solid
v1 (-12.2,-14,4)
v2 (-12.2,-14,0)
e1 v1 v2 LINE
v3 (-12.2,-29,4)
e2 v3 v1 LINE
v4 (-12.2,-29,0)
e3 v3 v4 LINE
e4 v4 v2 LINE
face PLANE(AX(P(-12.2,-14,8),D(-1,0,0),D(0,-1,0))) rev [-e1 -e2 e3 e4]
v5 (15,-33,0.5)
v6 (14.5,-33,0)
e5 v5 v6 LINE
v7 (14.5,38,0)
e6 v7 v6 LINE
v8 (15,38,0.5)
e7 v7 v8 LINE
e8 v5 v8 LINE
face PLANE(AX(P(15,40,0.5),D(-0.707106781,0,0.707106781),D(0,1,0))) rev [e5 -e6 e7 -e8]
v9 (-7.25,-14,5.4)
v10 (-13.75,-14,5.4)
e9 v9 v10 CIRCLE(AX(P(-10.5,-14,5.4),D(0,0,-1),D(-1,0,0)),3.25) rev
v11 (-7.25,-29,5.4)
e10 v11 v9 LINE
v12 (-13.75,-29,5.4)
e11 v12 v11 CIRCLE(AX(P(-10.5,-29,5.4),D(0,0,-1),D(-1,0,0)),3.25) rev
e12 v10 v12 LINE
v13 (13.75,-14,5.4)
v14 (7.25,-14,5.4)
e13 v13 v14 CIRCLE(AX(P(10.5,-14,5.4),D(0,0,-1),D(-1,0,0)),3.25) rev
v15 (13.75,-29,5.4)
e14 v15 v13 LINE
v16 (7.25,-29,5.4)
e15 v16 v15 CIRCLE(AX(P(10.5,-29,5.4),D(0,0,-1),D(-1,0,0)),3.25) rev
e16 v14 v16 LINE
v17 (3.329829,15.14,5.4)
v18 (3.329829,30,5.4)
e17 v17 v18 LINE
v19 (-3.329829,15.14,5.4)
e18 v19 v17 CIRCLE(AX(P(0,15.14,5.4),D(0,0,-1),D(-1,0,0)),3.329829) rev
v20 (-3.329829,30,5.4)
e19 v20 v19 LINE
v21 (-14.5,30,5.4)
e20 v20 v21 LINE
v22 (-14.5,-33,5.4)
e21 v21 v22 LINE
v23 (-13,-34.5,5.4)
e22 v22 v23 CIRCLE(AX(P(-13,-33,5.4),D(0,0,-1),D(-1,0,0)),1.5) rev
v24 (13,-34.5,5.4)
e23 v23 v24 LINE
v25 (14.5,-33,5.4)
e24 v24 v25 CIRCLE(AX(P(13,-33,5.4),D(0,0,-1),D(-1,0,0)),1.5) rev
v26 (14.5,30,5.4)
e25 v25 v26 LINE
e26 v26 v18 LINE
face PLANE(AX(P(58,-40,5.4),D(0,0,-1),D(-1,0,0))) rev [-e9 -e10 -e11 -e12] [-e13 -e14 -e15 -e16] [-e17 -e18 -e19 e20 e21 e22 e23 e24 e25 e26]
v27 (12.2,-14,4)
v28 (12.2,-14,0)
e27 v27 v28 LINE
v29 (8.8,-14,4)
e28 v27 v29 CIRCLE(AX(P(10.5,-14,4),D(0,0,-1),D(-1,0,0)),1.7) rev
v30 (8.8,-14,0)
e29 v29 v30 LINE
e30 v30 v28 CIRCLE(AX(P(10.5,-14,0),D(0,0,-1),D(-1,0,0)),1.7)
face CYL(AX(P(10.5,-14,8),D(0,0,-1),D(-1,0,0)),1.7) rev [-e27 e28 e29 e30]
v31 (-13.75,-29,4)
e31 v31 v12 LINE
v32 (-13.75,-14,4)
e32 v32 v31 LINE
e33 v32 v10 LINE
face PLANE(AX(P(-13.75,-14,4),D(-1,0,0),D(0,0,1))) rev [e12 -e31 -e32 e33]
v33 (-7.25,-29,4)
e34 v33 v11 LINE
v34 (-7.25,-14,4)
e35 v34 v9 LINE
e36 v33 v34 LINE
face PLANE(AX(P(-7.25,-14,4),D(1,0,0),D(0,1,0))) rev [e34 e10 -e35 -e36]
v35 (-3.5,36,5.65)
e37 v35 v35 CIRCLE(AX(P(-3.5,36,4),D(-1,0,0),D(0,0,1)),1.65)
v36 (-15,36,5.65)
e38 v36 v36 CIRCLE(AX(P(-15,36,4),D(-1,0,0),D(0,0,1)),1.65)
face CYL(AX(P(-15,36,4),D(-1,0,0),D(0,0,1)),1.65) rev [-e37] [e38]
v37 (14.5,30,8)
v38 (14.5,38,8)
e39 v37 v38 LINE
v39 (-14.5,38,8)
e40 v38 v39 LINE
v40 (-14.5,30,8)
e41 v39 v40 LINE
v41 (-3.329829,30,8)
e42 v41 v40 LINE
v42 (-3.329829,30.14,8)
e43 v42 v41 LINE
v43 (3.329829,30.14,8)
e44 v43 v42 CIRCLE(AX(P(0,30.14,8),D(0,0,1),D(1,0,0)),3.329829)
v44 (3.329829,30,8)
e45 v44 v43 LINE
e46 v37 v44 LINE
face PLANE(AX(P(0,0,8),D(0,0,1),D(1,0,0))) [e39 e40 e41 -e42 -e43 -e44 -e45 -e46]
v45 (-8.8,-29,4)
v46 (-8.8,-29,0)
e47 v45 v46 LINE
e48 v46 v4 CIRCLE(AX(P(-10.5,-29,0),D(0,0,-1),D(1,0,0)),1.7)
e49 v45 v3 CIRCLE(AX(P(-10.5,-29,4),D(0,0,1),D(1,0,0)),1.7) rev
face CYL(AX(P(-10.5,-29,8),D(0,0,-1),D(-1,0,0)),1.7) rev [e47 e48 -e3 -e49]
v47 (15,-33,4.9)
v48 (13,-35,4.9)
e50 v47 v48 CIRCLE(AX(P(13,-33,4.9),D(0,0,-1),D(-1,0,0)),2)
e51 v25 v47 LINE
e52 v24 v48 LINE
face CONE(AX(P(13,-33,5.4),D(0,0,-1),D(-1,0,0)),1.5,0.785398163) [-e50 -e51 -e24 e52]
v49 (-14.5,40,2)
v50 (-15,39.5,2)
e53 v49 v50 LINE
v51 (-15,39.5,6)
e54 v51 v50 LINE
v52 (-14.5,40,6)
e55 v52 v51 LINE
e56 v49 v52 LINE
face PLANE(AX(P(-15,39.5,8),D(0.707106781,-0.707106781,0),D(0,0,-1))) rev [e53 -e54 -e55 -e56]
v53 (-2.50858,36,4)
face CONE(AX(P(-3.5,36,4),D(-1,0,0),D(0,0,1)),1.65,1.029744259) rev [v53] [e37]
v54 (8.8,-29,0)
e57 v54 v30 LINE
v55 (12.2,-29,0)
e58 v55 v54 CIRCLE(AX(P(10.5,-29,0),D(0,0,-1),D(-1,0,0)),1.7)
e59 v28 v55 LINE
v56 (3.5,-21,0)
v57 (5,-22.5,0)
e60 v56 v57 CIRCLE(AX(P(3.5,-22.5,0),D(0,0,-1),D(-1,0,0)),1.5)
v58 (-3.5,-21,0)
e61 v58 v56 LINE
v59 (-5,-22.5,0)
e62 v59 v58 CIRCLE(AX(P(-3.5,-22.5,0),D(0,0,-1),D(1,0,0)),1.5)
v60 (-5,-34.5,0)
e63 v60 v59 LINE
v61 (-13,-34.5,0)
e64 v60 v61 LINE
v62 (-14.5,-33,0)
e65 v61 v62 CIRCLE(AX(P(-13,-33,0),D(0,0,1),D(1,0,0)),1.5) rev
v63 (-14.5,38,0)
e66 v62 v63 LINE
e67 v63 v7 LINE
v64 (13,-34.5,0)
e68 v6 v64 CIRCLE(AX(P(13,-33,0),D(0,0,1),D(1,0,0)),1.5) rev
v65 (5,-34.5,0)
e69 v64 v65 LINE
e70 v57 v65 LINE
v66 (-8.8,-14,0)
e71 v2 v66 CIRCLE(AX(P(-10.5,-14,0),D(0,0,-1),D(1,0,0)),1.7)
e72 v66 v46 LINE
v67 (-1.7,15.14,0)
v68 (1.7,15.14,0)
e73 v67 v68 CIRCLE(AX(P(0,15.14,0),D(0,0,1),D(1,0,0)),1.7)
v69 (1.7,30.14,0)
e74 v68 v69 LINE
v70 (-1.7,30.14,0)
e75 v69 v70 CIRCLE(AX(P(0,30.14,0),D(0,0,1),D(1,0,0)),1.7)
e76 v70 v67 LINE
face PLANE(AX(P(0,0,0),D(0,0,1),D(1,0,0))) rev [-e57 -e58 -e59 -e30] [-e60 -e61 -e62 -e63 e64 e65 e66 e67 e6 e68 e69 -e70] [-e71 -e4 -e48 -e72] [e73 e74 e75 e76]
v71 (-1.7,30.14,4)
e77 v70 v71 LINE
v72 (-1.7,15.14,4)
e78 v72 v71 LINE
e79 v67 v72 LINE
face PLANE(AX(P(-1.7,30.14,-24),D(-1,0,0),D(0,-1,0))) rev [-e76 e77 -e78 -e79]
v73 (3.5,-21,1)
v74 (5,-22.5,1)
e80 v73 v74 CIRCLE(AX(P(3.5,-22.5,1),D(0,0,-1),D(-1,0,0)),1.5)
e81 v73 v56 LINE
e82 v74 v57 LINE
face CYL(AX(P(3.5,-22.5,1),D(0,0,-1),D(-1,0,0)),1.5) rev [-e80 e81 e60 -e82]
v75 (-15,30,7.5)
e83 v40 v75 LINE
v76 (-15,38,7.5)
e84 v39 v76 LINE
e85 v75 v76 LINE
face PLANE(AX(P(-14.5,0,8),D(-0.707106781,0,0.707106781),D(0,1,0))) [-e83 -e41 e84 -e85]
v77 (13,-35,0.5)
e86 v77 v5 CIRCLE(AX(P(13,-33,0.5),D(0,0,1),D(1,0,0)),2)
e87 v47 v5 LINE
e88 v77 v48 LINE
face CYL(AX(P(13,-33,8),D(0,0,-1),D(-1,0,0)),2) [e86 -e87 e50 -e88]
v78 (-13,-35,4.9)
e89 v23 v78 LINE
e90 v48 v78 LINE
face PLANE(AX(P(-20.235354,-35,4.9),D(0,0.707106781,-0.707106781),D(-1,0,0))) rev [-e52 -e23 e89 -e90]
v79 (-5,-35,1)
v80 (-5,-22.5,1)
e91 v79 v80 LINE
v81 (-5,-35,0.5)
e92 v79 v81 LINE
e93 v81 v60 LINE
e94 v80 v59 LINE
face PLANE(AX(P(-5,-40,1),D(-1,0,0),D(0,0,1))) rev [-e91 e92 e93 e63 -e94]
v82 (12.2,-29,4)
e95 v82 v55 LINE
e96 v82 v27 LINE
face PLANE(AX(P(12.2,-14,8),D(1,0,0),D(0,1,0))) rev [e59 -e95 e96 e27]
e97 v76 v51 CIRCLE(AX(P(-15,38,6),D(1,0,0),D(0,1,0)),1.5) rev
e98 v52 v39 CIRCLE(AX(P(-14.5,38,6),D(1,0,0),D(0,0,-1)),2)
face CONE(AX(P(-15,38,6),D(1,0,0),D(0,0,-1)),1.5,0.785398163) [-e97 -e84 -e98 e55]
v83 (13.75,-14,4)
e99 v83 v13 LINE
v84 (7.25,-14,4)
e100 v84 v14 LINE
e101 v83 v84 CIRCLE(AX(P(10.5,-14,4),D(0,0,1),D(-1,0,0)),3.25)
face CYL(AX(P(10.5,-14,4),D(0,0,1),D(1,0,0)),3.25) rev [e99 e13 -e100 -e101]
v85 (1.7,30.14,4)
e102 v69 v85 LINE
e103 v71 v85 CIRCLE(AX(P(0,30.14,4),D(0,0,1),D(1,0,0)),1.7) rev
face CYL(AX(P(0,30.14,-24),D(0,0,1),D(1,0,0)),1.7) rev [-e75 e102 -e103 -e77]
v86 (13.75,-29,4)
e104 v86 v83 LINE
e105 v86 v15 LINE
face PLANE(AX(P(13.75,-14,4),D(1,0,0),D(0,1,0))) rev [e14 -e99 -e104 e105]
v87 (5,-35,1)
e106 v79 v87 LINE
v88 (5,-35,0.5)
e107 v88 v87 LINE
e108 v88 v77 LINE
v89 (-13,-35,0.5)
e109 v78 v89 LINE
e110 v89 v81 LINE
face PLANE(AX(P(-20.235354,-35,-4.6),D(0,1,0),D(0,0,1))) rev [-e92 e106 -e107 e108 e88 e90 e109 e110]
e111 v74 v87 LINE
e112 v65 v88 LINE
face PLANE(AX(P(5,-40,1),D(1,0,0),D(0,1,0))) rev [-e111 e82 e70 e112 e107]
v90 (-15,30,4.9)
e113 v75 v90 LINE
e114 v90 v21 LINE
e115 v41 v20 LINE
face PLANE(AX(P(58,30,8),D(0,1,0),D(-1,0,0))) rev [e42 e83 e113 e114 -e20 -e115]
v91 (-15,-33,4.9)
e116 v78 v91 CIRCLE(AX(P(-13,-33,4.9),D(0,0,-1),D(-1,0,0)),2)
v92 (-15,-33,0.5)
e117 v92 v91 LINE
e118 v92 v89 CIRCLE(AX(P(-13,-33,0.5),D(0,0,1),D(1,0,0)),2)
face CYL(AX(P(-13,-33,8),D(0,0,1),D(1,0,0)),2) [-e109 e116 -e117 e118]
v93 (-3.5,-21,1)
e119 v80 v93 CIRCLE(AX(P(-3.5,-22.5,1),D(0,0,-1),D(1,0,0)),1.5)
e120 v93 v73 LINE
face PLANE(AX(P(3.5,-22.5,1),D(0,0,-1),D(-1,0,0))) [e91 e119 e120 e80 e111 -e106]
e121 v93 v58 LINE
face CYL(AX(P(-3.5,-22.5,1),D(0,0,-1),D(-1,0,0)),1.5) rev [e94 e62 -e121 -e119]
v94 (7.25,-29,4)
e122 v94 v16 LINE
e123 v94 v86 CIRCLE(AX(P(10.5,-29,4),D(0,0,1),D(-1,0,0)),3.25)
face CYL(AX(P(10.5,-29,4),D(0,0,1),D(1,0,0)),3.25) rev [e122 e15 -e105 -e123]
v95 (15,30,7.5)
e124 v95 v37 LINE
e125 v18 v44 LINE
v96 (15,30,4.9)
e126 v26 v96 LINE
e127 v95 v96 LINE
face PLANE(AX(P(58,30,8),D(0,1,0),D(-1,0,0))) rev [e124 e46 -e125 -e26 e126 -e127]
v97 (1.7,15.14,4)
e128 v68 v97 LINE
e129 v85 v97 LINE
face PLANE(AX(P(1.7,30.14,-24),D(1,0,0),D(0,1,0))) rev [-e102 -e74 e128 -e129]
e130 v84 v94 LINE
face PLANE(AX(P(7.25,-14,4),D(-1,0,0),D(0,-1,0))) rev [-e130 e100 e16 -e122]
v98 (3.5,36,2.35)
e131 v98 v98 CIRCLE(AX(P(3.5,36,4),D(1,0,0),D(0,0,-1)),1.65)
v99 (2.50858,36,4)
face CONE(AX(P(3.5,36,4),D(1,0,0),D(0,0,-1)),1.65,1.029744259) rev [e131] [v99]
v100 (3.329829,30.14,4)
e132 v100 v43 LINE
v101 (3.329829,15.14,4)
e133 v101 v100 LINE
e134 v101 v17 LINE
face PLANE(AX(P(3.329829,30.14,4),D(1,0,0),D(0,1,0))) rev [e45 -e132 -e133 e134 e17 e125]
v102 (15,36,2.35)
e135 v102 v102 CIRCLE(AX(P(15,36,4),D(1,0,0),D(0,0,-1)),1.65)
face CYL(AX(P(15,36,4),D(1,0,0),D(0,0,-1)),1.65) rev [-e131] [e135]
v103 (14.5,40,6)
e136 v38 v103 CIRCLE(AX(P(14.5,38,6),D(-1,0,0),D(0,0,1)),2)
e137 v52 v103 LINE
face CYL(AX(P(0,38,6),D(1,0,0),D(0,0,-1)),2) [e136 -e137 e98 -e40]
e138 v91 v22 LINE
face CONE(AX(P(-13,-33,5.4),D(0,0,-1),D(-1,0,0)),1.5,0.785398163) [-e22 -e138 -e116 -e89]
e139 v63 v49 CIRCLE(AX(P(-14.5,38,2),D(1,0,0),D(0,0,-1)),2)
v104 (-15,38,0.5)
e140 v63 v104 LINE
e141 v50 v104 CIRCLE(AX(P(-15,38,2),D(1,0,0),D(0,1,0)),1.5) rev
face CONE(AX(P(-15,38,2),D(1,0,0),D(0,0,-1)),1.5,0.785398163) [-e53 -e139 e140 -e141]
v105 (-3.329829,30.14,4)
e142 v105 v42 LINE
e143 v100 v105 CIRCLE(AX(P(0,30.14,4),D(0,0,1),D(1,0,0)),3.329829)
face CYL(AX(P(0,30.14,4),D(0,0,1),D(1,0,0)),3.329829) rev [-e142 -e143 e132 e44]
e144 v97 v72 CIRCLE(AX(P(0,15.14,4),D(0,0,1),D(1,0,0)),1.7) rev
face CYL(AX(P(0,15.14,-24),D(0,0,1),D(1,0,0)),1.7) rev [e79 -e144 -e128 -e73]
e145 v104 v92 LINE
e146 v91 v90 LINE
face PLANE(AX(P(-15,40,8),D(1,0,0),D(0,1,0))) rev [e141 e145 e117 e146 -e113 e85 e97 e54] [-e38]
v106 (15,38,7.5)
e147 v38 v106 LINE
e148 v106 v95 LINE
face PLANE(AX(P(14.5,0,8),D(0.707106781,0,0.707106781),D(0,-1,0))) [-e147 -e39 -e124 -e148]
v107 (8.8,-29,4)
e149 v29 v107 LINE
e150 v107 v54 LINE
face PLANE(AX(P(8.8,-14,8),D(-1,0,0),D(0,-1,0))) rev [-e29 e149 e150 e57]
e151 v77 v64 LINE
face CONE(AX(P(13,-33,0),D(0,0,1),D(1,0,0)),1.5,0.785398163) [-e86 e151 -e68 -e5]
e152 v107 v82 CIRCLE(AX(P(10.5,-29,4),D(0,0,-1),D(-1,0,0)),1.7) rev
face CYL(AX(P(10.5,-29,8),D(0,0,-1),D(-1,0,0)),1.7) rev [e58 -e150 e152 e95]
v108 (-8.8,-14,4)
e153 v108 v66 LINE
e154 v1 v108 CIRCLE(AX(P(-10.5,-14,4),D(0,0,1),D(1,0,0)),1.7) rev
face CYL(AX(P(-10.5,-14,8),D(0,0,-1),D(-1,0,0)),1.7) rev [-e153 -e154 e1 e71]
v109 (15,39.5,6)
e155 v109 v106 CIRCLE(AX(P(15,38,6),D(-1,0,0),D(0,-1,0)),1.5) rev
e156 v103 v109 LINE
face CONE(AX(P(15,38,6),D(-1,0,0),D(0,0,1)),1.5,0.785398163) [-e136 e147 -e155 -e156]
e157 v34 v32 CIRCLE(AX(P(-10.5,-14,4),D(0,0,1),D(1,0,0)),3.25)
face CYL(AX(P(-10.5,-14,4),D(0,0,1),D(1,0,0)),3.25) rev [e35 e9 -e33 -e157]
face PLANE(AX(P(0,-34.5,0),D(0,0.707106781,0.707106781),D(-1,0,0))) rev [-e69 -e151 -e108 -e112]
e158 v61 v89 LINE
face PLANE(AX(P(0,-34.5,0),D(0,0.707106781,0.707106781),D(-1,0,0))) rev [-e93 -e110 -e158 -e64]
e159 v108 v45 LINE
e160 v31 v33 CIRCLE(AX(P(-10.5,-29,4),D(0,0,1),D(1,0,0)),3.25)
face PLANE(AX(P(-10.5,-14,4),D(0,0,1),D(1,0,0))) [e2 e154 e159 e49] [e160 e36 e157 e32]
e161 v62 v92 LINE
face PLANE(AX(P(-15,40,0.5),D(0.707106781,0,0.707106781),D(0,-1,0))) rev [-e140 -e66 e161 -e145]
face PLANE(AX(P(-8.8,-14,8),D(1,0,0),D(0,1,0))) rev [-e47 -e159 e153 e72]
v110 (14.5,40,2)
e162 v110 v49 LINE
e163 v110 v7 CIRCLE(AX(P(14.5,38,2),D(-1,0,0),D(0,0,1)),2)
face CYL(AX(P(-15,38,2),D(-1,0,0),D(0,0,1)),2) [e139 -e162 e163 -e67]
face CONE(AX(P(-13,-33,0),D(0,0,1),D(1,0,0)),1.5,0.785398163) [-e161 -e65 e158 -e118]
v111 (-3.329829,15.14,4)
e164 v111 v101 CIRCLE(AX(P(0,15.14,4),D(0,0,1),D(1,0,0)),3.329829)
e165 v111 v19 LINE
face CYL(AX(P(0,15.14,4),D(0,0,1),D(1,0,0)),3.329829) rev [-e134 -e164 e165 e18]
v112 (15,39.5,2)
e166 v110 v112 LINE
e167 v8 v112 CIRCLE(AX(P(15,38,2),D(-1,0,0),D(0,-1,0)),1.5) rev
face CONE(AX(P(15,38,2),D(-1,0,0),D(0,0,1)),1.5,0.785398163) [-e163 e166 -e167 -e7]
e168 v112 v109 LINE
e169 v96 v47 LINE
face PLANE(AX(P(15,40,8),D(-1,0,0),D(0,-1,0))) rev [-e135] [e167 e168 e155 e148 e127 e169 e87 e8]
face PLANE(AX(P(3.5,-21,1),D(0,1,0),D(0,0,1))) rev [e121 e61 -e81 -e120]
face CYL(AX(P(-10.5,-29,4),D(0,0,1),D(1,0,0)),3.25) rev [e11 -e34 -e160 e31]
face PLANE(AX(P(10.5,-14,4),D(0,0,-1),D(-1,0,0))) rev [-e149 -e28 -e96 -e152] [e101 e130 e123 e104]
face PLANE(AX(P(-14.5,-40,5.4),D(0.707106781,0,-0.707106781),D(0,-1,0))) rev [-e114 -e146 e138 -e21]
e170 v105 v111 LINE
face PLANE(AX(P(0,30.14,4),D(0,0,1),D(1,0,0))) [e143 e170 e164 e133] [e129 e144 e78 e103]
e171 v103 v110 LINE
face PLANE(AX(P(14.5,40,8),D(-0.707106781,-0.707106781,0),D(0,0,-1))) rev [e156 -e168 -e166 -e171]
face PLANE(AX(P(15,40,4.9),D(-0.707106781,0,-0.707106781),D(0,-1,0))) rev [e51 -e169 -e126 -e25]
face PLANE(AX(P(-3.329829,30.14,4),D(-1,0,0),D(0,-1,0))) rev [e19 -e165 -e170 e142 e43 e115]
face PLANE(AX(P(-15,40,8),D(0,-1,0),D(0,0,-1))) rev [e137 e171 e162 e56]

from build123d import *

# Parameters (mm, degrees)
SKETCH1_W           = 30
SKETCH1_H           = 80
BOSS_EXTRUDE1_DEPTH = 8
CUT_EXTRUDE1_DEPTH  = 44.462627624
CUT_EXTRUDE2_DEPTH  = 4
CUT_EXTRUDE3_DEPTH  = 32
CUT_EXTRUDE4_DEPTH  = 4
SKETCH8_W           = 2.6
SKETCH8_H           = 70
CUT_EXTRUDE5_DEPTH  = 73
FILLET1_R           = 2
FILLET2_R           = 2
CHAMFER1_SIZE       = 0.5
CUT_EXTRUDE7_DEPTH  = 1
SKETCH10_W          = 41.633807812
SKETCH10_H          = 5
CUT_EXTRUDE8_DEPTH  = 10
FILLET3_R           = 2
CHAMFER2_SIZE       = 0.5


with BuildPart() as part:
    # Sketch1 → Boss-Extrude1 (new body)
    with BuildSketch(Plane.XY):
        Rectangle(SKETCH1_W, SKETCH1_H)
    extrude(amount=BOSS_EXTRUDE1_DEPTH)

    # Sketch3 → M4 Tapped Hole1 (revolve, cut)
    with BuildSketch(Plane(origin=(-15, 36, 4), x_dir=(0, 0, 1), z_dir=(0, 1, 0))):
        Polygon((0, 0), (0, 12.491420021), (1.65, 11.5), (1.65, 0), align=None)
    m4_tapped_hole1 = revolve(axis=Axis((-21.35, 36, 4), (1, 0, 0)), mode=Mode.SUBTRACT)

    # Mirror1: M4 Tapped Hole1 across plane
    add(m4_tapped_hole1.mirror(Plane.ZY), mode=Mode.SUBTRACT)

    # Sketch4 → Cut-Extrude1 (cut, through all)
    with BuildSketch(Plane(origin=(0, 0, 0), x_dir=(-1, 0, 0), z_dir=(0, 0, -1))):
        with BuildLine():
            Line((-8.8, -14), (-8.8, -29))
            ThreePointArc((-8.8, -29), (-10.5, -30.7), (-12.2, -29))
            Line((-12.2, -29), (-12.2, -14))
            ThreePointArc((-12.2, -14), (-10.5, -12.3), (-8.8, -14))
        make_face()
        with BuildLine():
            Line((8.8, -14), (8.8, -29))
            ThreePointArc((8.8, -29), (10.5, -30.7), (12.2, -29))
            Line((12.2, -29), (12.2, -14))
            ThreePointArc((12.2, -14), (10.5, -12.3), (8.8, -14))
        make_face()
    extrude(amount=-CUT_EXTRUDE1_DEPTH, mode=Mode.SUBTRACT)

    # Sketch5 → Cut-Extrude2 (cut)
    with BuildSketch(Plane.XY.offset(8)):
        with BuildLine():
            Line((-7.25, -14), (-7.25, -29))
            ThreePointArc((-7.25, -29), (-10.5, -32.25), (-13.75, -29))
            Line((-13.75, -29), (-13.75, -14))
            ThreePointArc((-13.75, -14), (-10.5, -10.75), (-7.25, -14))
        make_face()
        with BuildLine():
            Line((7.25, -14), (7.25, -29))
            ThreePointArc((7.25, -29), (10.5, -32.25), (13.75, -29))
            Line((13.75, -29), (13.75, -14))
            ThreePointArc((13.75, -14), (10.5, -10.75), (7.25, -14))
        make_face()
    extrude(amount=-CUT_EXTRUDE2_DEPTH, mode=Mode.SUBTRACT)

    # Sketch6 → Cut-Extrude3 (cut)
    with BuildSketch(Plane.XY.offset(8)):
        with BuildLine():
            Line((1.7, 30.14), (1.7, 15.14))
            ThreePointArc((1.7, 15.14), (0, 13.44), (-1.7, 15.14))
            Line((-1.7, 15.14), (-1.7, 30.14))
            ThreePointArc((-1.7, 30.14), (0, 31.84), (1.7, 30.14))
        make_face()
    extrude(amount=-CUT_EXTRUDE3_DEPTH, mode=Mode.SUBTRACT)

    # Sketch7 → Cut-Extrude4 (cut)
    with BuildSketch(Plane.XY.offset(8)):
        with BuildLine():
            Line((3.329829484, 30.14), (3.329829484, 15.14))
            ThreePointArc((3.329829484, 15.14), (0, 11.810170516), (-3.329829484, 15.14))
            Line((-3.329829484, 15.14), (-3.329829484, 30.14))
            ThreePointArc((-3.329829484, 30.14), (0, 33.469829484), (3.329829484, 30.14))
        make_face()
    extrude(amount=-CUT_EXTRUDE4_DEPTH, mode=Mode.SUBTRACT)

    # Sketch8 → Cut-Extrude5 (cut)
    with BuildSketch(Plane.ZY.offset(15)):
        with Locations((6.7, -5)):
            Rectangle(SKETCH8_W, SKETCH8_H)
    extrude(amount=-CUT_EXTRUDE5_DEPTH, mode=Mode.SUBTRACT)

    # Fillet1
    fillet1_edges = [part.edges().sort_by_distance(p)[0] for p in [
        (0, 40, 0),
        (0, 40, 8),
    ]]
    fillet(fillet1_edges, radius=FILLET1_R)

    # Fillet2
    fillet2_edges = [part.edges().sort_by_distance(p)[0] for p in [
        (15, -40, 2.7),
        (-15, -40, 2.7),
    ]]
    fillet(fillet2_edges, radius=FILLET2_R)

    # Chamfer1
    chamfer1_edges = [part.edges().sort_by_distance(p)[0] for p in [
        (15, 34, 8),
        (15, -4, 5.4),
        (-15, -4, 5.4),
        (-15, 34, 8),
        (-15, 40, 4),
        (-15, 0, 0),
        (-15, 39.414213562, 0.585786438),
        (-15, 39.414213562, 7.414213562),
        (15, 40, 4),
        (15, 39.414213562, 0.585786438),
        (15, 39.414213562, 7.414213562),
        (0, -40, 5.4),
        (0, -40, 0),
        (15, 0, 0),
        (14.414213562, -39.414213562, 0),
        (-14.414213562, -39.414213562, 0),
        (14.414213562, -39.414213562, 5.4),
        (-14.414213562, -39.414213562, 5.4),
    ]]
    chamfer(chamfer1_edges, length=CHAMFER1_SIZE)

    # Sketch9 → Cut-Extrude7 (cut)
    with BuildSketch(Plane(origin=(0, 0, 0), x_dir=(-1, 0, 0), z_dir=(0, 0, -1))):
        with BuildLine():
            Line((-5, -40), (5, -40))
            Line((5, -40), (5, -22.5))
            ThreePointArc((5, -22.5), (4.560660172, -21.439339828), (3.5, -21))
            Line((3.5, -21), (-3.5, -21))
            ThreePointArc((-3.5, -21), (-4.560660172, -21.439339828), (-5, -22.5))
            Line((-5, -22.5), (-5, -40))
        make_face()
    extrude(amount=-CUT_EXTRUDE7_DEPTH, mode=Mode.SUBTRACT)

    # Sketch10 → Cut-Extrude8 (cut)
    with BuildSketch(Plane.XY.offset(5.4)):
        with Locations((0.581549675, -37.5)):
            Rectangle(SKETCH10_W, SKETCH10_H)
    extrude(amount=-CUT_EXTRUDE8_DEPTH, mode=Mode.SUBTRACT)

    # Fillet3
    fillet3_edges = [part.edges().sort_by_distance(p)[0] for p in [
        (15, -35, 2.7),
        (-15, -35, 2.7),
    ]]
    fillet(fillet3_edges, radius=FILLET3_R)

    # Chamfer2
    chamfer2_edges = [part.edges().sort_by_distance(p)[0] for p in [
        (13.822875656, -34.822875656, 0),
        (9, -35, 0),
        (13.822875656, -34.822875656, 5.4),
        (-13.822875656, -34.822875656, 5.4),
        (0, -35, 5.4),
        (-13.822875656, -34.822875656, 0),
        (-9, -35, 0),
    ]]
    chamfer(chamfer2_edges, length=CHAMFER2_SIZE - 0.0001)  # a hair under: the kernel refuses the full size


solid = part.part
